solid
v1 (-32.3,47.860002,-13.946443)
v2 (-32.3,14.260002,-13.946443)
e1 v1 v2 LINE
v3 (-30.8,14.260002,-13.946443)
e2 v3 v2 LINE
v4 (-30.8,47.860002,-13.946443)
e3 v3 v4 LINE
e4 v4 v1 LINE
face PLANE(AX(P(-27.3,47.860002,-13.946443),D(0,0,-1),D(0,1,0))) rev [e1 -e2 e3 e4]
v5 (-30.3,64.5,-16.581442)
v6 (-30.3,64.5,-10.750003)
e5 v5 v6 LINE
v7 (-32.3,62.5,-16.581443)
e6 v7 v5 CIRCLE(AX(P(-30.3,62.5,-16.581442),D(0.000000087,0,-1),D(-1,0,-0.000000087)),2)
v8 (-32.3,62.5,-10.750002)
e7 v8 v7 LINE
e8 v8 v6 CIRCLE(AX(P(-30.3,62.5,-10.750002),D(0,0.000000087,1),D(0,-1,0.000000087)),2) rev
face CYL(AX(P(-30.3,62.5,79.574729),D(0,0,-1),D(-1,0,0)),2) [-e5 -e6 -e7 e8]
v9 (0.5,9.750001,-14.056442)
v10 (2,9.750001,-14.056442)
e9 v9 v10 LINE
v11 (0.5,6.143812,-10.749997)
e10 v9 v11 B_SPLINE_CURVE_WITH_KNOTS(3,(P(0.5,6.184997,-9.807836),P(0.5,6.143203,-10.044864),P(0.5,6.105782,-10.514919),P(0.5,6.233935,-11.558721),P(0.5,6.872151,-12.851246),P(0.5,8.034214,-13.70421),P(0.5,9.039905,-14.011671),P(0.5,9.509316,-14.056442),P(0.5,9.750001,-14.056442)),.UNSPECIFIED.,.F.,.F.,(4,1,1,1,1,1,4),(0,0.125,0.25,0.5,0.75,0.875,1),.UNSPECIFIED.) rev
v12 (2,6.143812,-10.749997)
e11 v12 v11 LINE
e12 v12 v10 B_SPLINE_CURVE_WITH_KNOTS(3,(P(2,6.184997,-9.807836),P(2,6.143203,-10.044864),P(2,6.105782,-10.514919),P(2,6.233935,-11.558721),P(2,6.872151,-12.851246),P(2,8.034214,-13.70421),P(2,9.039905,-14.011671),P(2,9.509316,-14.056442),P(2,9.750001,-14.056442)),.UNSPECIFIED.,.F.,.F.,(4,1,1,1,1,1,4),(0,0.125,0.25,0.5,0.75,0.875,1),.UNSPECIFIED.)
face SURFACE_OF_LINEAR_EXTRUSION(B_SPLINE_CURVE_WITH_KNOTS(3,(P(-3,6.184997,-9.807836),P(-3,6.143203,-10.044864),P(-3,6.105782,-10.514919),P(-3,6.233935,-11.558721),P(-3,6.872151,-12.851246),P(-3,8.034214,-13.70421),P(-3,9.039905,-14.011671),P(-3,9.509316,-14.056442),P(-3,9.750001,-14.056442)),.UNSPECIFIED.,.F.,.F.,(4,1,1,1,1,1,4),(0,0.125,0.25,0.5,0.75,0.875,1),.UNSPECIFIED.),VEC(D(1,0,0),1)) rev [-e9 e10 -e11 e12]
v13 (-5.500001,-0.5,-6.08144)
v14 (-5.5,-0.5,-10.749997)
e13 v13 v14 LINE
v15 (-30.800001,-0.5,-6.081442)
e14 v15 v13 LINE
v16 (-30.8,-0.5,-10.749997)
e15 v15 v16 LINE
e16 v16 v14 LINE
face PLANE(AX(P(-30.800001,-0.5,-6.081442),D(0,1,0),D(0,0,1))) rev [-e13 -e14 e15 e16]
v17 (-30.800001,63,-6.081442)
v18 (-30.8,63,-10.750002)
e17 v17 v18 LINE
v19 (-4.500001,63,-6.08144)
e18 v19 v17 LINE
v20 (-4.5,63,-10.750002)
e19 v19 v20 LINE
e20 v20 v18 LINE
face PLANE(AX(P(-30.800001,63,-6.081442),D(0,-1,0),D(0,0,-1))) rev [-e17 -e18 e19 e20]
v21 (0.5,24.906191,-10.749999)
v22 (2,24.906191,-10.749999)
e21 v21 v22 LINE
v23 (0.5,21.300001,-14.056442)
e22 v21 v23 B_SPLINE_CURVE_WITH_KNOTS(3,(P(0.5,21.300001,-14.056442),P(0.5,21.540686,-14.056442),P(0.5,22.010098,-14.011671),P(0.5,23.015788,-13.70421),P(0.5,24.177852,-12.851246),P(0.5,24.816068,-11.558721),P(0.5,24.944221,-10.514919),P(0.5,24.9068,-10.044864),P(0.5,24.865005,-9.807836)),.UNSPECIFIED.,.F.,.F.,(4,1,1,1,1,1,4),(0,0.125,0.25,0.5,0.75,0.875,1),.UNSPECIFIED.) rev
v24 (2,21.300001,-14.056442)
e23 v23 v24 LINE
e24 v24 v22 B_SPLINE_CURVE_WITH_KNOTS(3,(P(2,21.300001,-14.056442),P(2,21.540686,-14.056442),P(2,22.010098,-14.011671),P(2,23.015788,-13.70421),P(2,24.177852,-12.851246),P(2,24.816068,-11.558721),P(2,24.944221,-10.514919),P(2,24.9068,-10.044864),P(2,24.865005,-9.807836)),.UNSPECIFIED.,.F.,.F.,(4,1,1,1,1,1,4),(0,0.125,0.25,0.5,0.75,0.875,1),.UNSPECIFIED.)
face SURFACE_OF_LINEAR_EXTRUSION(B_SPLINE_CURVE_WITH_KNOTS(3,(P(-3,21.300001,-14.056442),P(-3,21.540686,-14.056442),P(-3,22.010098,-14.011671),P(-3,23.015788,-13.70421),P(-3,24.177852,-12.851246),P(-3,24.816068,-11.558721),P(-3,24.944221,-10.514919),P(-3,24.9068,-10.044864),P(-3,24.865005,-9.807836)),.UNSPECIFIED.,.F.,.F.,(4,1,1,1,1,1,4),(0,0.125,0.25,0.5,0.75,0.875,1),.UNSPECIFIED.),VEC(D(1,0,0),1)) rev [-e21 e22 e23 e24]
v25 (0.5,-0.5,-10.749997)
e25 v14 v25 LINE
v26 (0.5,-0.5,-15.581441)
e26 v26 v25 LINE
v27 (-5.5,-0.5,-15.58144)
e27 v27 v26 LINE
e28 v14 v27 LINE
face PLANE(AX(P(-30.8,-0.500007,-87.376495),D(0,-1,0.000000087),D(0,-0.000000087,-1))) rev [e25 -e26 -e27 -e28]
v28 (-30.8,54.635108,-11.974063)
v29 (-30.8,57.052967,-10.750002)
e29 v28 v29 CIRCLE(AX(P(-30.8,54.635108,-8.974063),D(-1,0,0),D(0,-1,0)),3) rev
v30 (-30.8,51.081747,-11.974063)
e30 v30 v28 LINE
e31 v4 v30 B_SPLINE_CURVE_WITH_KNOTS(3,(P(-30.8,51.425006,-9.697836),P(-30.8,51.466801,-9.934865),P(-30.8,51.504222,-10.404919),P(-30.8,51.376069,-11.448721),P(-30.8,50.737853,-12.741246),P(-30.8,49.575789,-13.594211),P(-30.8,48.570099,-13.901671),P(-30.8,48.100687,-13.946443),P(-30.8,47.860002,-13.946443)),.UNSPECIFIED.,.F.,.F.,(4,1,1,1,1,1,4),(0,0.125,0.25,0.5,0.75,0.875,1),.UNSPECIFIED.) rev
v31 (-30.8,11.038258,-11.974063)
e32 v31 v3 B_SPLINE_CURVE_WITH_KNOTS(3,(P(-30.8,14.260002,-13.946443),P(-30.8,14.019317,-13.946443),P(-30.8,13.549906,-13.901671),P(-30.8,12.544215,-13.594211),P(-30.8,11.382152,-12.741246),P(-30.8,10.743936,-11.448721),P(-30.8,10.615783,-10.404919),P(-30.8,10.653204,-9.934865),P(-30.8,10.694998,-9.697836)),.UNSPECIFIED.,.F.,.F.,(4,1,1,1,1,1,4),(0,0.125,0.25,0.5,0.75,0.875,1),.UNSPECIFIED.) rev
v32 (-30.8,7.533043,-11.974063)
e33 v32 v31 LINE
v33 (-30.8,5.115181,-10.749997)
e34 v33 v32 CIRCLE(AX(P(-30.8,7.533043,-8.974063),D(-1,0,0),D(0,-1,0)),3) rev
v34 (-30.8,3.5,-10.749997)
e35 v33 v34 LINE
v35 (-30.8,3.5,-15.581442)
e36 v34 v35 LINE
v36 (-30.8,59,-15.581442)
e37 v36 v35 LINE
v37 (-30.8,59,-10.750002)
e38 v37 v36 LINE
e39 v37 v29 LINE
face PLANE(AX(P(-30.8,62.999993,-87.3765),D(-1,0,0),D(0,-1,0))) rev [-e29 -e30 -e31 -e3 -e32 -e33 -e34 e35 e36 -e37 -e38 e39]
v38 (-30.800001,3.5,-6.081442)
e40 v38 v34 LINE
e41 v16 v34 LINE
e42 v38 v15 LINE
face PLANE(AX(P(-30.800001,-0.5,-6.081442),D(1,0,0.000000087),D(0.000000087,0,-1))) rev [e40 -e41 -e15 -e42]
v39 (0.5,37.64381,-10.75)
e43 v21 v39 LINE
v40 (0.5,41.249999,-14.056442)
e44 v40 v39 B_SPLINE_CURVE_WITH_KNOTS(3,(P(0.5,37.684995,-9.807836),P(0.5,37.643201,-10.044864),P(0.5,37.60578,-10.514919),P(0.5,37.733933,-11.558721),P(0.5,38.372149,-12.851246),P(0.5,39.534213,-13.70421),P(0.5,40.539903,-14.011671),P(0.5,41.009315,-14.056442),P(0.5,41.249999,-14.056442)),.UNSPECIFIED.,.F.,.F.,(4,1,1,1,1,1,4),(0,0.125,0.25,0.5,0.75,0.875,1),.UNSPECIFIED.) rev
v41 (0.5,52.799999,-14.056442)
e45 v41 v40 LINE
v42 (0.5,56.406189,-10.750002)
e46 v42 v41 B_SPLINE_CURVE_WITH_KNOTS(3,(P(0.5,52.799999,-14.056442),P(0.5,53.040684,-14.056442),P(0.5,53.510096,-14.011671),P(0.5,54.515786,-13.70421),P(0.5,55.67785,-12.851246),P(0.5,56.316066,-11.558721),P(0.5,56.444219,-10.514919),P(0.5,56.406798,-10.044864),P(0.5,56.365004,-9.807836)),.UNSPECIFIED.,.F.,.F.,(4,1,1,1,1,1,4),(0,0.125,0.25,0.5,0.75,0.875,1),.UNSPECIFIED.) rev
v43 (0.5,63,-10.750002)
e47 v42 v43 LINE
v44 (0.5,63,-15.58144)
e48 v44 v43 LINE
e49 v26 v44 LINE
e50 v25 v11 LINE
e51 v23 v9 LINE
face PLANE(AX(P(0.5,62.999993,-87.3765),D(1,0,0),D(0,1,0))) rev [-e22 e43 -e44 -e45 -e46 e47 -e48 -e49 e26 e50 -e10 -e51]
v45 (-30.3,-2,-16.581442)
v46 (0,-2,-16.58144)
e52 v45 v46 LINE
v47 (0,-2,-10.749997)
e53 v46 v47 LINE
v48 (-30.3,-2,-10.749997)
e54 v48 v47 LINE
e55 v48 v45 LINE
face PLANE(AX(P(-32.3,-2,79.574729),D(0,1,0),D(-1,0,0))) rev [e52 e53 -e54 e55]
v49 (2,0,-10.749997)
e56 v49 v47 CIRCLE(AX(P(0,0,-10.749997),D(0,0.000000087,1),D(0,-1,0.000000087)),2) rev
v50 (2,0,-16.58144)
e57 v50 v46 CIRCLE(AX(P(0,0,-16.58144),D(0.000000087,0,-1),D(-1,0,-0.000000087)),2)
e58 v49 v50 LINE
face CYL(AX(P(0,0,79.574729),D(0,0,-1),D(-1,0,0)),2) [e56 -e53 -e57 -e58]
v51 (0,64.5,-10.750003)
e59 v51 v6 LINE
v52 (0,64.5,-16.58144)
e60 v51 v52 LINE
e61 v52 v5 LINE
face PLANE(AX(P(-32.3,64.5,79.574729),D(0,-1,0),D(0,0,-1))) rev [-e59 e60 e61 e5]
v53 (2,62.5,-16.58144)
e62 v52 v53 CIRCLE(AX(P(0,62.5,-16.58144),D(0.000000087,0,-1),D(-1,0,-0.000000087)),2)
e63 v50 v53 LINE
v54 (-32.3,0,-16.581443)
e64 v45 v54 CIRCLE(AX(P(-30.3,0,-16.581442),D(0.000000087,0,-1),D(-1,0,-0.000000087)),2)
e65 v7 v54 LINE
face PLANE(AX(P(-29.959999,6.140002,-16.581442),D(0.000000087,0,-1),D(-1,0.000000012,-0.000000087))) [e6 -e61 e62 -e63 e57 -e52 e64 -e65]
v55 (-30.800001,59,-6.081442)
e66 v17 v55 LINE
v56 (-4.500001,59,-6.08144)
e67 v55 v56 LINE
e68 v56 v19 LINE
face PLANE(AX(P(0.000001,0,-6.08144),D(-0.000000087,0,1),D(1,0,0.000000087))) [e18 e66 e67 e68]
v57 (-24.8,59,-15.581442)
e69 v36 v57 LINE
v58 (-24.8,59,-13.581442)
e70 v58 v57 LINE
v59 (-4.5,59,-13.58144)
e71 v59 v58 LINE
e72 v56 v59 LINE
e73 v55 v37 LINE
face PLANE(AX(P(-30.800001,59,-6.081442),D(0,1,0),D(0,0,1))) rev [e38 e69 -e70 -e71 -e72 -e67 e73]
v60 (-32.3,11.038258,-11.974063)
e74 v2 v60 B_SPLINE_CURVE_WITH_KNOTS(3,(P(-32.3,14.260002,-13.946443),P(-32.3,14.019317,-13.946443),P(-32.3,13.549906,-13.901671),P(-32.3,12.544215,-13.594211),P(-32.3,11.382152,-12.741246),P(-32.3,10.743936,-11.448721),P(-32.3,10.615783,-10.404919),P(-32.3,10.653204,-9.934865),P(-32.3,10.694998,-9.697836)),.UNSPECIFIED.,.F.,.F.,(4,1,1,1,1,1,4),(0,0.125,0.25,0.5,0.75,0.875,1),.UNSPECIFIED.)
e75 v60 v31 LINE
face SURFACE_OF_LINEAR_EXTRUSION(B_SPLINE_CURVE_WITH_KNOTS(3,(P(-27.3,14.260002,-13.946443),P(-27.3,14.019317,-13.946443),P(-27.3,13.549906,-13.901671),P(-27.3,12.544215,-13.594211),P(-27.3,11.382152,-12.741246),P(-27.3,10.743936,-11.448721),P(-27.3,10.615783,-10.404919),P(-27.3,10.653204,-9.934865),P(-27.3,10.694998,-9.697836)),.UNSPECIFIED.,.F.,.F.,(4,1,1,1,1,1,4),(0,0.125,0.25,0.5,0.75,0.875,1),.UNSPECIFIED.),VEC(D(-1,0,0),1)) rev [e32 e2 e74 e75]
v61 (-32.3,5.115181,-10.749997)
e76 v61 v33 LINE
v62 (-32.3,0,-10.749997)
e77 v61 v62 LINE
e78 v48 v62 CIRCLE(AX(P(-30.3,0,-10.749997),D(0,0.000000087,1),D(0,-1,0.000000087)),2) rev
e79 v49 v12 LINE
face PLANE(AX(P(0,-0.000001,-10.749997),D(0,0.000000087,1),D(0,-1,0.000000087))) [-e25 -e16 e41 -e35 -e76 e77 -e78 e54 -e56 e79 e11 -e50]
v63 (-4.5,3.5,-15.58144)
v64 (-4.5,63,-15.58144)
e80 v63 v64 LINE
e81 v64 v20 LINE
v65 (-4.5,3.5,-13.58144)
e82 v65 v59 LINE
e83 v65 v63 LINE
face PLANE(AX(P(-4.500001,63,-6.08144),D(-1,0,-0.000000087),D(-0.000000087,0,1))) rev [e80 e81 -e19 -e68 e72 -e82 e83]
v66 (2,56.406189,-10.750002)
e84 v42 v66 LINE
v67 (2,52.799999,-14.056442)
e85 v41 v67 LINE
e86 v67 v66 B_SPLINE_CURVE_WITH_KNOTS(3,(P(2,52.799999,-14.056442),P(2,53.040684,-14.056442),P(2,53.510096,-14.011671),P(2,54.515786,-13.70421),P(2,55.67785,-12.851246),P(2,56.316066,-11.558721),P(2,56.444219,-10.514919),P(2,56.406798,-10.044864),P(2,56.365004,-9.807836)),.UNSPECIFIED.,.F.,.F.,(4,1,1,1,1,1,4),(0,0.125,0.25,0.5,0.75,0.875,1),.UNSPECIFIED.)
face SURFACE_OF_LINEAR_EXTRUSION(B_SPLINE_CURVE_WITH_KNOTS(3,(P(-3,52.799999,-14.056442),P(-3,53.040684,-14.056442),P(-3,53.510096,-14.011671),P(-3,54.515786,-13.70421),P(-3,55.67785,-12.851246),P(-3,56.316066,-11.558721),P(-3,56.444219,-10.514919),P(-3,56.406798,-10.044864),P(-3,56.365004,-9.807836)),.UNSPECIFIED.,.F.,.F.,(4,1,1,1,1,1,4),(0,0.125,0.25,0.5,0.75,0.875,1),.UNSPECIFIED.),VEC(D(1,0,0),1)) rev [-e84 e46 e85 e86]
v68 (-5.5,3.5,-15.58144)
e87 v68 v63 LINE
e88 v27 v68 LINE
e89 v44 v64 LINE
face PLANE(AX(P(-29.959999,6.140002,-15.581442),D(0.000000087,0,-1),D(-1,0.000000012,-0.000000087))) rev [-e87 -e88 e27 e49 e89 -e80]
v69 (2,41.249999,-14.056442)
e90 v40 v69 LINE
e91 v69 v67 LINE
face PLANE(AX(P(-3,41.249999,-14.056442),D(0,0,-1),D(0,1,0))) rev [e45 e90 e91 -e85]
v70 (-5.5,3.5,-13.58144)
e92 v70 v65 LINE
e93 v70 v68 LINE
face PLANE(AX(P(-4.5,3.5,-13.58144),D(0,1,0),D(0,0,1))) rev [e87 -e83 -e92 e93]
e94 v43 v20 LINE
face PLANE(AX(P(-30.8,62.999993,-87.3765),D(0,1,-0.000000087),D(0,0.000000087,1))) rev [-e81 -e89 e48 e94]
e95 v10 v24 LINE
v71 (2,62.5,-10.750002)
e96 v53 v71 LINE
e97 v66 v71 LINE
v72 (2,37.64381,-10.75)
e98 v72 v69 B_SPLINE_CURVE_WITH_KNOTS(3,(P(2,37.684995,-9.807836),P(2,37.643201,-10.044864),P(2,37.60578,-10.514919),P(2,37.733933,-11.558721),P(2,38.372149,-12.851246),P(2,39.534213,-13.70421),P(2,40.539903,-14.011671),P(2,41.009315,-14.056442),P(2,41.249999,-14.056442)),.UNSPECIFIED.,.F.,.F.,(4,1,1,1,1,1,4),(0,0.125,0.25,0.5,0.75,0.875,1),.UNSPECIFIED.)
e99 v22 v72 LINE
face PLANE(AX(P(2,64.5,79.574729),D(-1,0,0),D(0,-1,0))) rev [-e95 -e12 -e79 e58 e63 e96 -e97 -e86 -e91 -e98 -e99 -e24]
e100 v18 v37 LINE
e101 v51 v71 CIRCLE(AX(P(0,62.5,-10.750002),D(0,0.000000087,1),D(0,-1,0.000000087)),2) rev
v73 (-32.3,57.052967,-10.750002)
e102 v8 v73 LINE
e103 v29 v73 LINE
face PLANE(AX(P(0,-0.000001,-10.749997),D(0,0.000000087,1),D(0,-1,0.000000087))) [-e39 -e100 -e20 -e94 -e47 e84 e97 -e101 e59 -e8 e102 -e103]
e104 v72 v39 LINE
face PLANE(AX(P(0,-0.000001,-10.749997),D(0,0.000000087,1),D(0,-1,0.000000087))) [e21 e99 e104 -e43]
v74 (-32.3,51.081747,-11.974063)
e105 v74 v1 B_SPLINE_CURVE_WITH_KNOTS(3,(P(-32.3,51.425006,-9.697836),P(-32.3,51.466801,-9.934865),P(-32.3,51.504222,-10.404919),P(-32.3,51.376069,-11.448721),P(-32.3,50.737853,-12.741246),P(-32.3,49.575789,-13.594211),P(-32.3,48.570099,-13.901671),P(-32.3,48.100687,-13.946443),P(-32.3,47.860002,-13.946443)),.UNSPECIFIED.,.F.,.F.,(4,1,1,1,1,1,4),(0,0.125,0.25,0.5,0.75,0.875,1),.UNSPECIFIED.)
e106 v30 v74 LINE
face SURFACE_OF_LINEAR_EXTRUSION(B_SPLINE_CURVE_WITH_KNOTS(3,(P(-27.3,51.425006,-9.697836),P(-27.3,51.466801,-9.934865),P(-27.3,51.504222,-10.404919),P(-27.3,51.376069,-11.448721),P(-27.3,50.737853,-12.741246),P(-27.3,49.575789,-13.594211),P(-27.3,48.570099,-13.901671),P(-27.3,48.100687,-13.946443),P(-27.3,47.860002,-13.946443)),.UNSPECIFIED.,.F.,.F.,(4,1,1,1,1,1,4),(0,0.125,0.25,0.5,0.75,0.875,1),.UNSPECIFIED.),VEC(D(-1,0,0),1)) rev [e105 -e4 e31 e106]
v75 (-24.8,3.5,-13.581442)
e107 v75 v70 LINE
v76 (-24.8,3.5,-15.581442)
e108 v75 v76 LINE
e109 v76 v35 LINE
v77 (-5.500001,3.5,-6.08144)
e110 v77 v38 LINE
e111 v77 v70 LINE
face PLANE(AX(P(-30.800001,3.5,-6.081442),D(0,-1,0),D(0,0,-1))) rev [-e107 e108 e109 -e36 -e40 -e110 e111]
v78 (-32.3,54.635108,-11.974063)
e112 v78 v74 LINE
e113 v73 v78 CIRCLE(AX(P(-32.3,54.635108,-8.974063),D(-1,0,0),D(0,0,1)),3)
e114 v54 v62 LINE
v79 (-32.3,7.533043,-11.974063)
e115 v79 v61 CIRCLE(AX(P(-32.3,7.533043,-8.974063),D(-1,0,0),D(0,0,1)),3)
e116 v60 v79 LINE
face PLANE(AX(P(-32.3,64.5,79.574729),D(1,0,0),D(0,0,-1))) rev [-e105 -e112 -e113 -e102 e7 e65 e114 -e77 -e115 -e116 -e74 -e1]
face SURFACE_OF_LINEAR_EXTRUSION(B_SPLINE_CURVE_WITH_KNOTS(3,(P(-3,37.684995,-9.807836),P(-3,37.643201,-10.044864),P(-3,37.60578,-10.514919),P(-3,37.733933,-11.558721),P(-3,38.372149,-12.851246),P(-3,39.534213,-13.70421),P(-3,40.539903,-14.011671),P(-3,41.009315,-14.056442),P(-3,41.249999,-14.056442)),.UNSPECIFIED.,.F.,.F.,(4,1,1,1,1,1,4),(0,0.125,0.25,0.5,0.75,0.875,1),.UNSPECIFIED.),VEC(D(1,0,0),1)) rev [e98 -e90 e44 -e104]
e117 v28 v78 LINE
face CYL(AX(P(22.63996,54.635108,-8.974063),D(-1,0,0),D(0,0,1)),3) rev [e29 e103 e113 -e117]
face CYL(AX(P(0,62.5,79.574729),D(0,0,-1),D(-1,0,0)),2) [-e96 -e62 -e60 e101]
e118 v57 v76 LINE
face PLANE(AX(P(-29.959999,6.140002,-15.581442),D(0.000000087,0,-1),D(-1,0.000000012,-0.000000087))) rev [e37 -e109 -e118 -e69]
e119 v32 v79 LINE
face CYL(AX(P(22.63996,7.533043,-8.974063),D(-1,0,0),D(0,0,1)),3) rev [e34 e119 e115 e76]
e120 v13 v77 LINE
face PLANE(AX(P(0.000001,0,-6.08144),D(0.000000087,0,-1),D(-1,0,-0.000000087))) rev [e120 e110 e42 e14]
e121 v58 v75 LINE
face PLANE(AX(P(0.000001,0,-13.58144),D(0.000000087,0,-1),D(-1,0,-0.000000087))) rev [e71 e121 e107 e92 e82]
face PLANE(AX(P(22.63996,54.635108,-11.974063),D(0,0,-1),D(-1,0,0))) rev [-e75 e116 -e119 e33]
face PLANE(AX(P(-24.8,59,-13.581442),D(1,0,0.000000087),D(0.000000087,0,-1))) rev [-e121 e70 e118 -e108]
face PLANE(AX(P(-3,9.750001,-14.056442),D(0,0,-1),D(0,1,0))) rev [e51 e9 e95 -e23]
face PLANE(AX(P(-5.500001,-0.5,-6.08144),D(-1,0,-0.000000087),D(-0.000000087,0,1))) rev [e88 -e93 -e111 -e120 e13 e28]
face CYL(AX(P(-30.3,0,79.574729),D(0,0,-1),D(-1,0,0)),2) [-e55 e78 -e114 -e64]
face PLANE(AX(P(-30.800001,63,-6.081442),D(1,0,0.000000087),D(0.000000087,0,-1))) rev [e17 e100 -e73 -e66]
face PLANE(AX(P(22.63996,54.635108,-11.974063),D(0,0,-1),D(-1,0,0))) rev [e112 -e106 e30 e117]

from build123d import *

# Parameters (mm, degrees)
BOSS_EXTRUDE3_DEPTH      = 3.249999
BOSS_EXTRUDE3_DEPTH_BACK = 16.581442
SKETCH1_W                = 34.3
SKETCH1_H                = 66.5
CUT_EXTRUDE1_DEPTH       = 5
CUT_EXTRUDE2_DEPTH       = 5
FILLET1_R                = 2
SKETCH5_W                = 51.30778099
SKETCH5_H                = 76.39990746
CUT_EXTRUDE3_DEPTH       = 14
SKETCH6_W                = 31.3
SKETCH6_H                = 63.5
CUT_EXTRUDE4_DEPTH       = 4.831437303
SKETCH7_W                = 26.3
SKETCH7_H                = 4
SKETCH7_W_2              = 25.3
BOSS_EXTRUDE4_DEPTH      = 9.5
SKETCH8_W                = 20.3
SKETCH8_H                = 55.5
BOSS_EXTRUDE5_DEPTH      = 2
CUT_EXTRUDE5_DEPTH       = 1.5


with BuildPart() as part:
    # Sketch1 → Boss-Extrude3 (new, two sides: drawn at the far end of the back side and taken through both)
    with BuildSketch(Plane.XY.offset(-BOSS_EXTRUDE3_DEPTH_BACK)):
        with Locations((-15.15, 31.25)):
            Rectangle(SKETCH1_W, SKETCH1_H)
    extrude(amount=BOSS_EXTRUDE3_DEPTH + BOSS_EXTRUDE3_DEPTH_BACK)

    # Sketch3 → Cut-Extrude1 (cut)
    with BuildSketch(Plane.ZY.offset(32.3)):
        with BuildLine():
            Line((-13.946442816, 47.860002379), (-13.946442816, 14.260002379))
            add(Edge.make_bspline(
                [(-13.946442816, 14.260002379), (-13.946442816, 14.019317473), (-13.90167089, 13.549905983), (-13.594210712, 12.544215416), (-12.741245974, 11.38215204), (-11.448721179, 10.74393594), (-10.404919412, 10.615783107), (-9.934864774, 10.653203818), (-9.697836412, 10.694998313)],
                knots=[0, 0, 0, 0, 0.125, 0.25, 0.5, 0.75, 0.875, 1, 1, 1, 1], degree=3))
            Line((-9.697836412, 10.694998313), (-6.707836413, 11.222215985))
            add(Edge.make_bspline(
                [(-6.707836413, 11.222215985), (-6.30796959, 11.292723295), (-5.54451734, 11.557407058), (-4.497780226, 12.405299319), (-3.844533346, 13.58336909), (-3.716442816, 14.381184638), (-3.716442816, 14.787220052)],
                knots=[0, 0, 0, 0, 0.25, 0.5, 0.75, 1, 1, 1, 1], degree=3))
            Line((-3.716442816, 14.787220052), (-3.716442816, 47.332784706))
            add(Edge.make_bspline(
                [(-3.716442816, 47.332784706), (-3.716442815, 47.73882012), (-3.844533346, 48.536635667), (-4.497780225, 49.714705439), (-5.544517339, 50.5625977), (-6.307969589, 50.827281463), (-6.707836412, 50.897788773)],
                knots=[0, 0, 0, 0, 0.25, 0.5, 0.75, 1, 1, 1, 1], degree=3))
            Line((-6.707836412, 50.897788773), (-9.697836412, 51.425006445))
            add(Edge.make_bspline(
                [(-9.697836412, 51.425006445), (-9.934864773, 51.46680094), (-10.404919411, 51.504221651), (-11.448721179, 51.376068818), (-12.741245974, 50.737852719), (-13.594210712, 49.575789343), (-13.90167089, 48.570098776), (-13.946442816, 48.100687285), (-13.946442816, 47.860002379)],
                knots=[0, 0, 0, 0, 0.125, 0.25, 0.5, 0.75, 0.875, 1, 1, 1, 1], degree=3))
        make_face()
    extrude(amount=-CUT_EXTRUDE1_DEPTH, mode=Mode.SUBTRACT)

    # Sketch4 → Cut-Extrude2 (cut)
    with BuildSketch(Plane(origin=(2, 0, 0), x_dir=(0, 0, -1), z_dir=(1, 0, 0))):
        with BuildLine():
            Line((6.817836087, 38.212213104), (9.807836086, 37.684995431))
            add(Edge.make_bspline(
                [(9.807836086, 37.684995431), (10.044864448, 37.643200936), (10.514919086, 37.605780225), (11.558720853, 37.733933058), (12.851245648, 38.372149158), (13.704210386, 39.534212534), (14.011670565, 40.539903101), (14.05644249, 41.009314591), (14.05644249, 41.249999497)],
                knots=[0, 0, 0, 0, 0.125, 0.25, 0.5, 0.75, 0.875, 1, 1, 1, 1], degree=3))
            Line((14.05644249, 41.249999497), (14.05644249, 52.799999497))
            add(Edge.make_bspline(
                [(14.05644249, 52.799999497), (14.05644249, 53.040684403), (14.011670565, 53.510095894), (13.704210386, 54.51578646), (12.851245648, 55.677849837), (11.558720853, 56.316065936), (10.514919086, 56.444218769), (10.044864448, 56.406798058), (9.807836087, 56.365003563)],
                knots=[0, 0, 0, 0, 0.125, 0.25, 0.5, 0.75, 0.875, 1, 1, 1, 1], degree=3))
            Line((9.807836087, 56.365003563), (6.817836087, 55.837785891))
            add(Edge.make_bspline(
                [(6.817836087, 55.837785891), (6.417969263, 55.767278581), (5.654517014, 55.502594818), (4.6077799, 54.654702557), (3.95453302, 53.476632786), (3.82644249, 52.678817239), (3.82644249, 52.272781825)],
                knots=[0, 0, 0, 0, 0.25, 0.5, 0.75, 1, 1, 1, 1], degree=3))
            Line((3.82644249, 52.272781825), (3.82644249, 41.77721717))
            add(Edge.make_bspline(
                [(3.82644249, 41.77721717), (3.82644249, 41.371181756), (3.95453302, 40.573366208), (4.6077799, 39.395296437), (5.654517014, 38.547404177), (6.417969263, 38.282720413), (6.817836087, 38.212213104)],
                knots=[0, 0, 0, 0, 0.25, 0.5, 0.75, 1, 1, 1, 1], degree=3))
        make_face()
        with BuildLine():
            Line((3.82644249, 20.772783732), (3.82644249, 10.277219077))
            add(Edge.make_bspline(
                [(3.82644249, 10.277219077), (3.82644249, 9.871183663), (3.95453302, 9.073368116), (4.6077799, 7.895298345), (5.654517014, 7.047406084), (6.417969263, 6.782722321), (6.817836087, 6.712215011)],
                knots=[0, 0, 0, 0, 0.25, 0.5, 0.75, 1, 1, 1, 1], degree=3))
            Line((6.817836087, 6.712215011), (9.807836086, 6.184997339))
            add(Edge.make_bspline(
                [(9.807836086, 6.184997339), (10.044864448, 6.143202843), (10.514919086, 6.105782132), (11.558720853, 6.233934965), (12.851245648, 6.872151065), (13.704210386, 8.034214441), (14.011670565, 9.039905008), (14.05644249, 9.509316499), (14.05644249, 9.750001404)],
                knots=[0, 0, 0, 0, 0.125, 0.25, 0.5, 0.75, 0.875, 1, 1, 1, 1], degree=3))
            Line((14.05644249, 9.750001404), (14.05644249, 21.300001404))
            add(Edge.make_bspline(
                [(14.05644249, 21.300001404), (14.05644249, 21.54068631), (14.011670565, 22.010097801), (13.704210386, 23.015788368), (12.851245648, 24.177851744), (11.558720853, 24.816067843), (10.514919086, 24.944220677), (10.044864448, 24.906799966), (9.807836087, 24.86500547)],
                knots=[0, 0, 0, 0, 0.125, 0.25, 0.5, 0.75, 0.875, 1, 1, 1, 1], degree=3))
            Line((9.807836087, 24.86500547), (6.817836087, 24.337787798))
            add(Edge.make_bspline(
                [(6.817836087, 24.337787798), (6.417969263, 24.267280488), (5.654517014, 24.002596725), (4.6077799, 23.154704464), (3.95453302, 21.976634693), (3.82644249, 21.178819146), (3.82644249, 20.772783732)],
                knots=[0, 0, 0, 0, 0.25, 0.5, 0.75, 1, 1, 1, 1], degree=3))
        make_face()
    extrude(amount=-CUT_EXTRUDE2_DEPTH, mode=Mode.SUBTRACT)

    # Fillet1
    fillet1_edges = [part.edges().sort_by_distance(p)[0] for p in [
        (-32.3, -2, -6.6657215),
        (2, -2, -6.6657215),
        (2, 64.5, -6.6657215),
        (-32.3, 64.5, -6.6657215),
    ]]
    fillet(fillet1_edges, radius=FILLET1_R)

    # Sketch5 → Cut-Extrude3 (cut)
    with BuildSketch(Plane(origin=(0, 2.84e-07, 3.250003097), x_dir=(1, 0, 0), z_dir=(0, 8.742273400000003e-08, 0.9999999999999963))):
        with Locations((-12.815688561, 29.564706803)):
            Rectangle(SKETCH5_W, SKETCH5_H)
    extrude(amount=-CUT_EXTRUDE3_DEPTH, mode=Mode.SUBTRACT)


with BuildPart() as cut_extrude3_kept_piece:
    # of the separate pieces the step leaves, the one the design keeps (cut_extrude3_pieces_kept)
    add(part.part.solids().sort_by_distance((-30.3, 64.5, -16.581442))[0])

    # Sketch6 → Cut-Extrude4 (cut)
    with BuildSketch(Plane(origin=(0, -9.4e-07, -10.749996903), x_dir=(1, 0, 0), z_dir=(0, 8.742273399652584e-08, 0.9999999999999963))):
        with Locations((-15.15, 31.25000094)):
            Rectangle(SKETCH6_W, SKETCH6_H)
    extrude(amount=-CUT_EXTRUDE4_DEPTH, mode=Mode.SUBTRACT)


with BuildPart() as boss_extrude4_tool:
    # Sketch7 → Boss-Extrude4 (new body)
    with BuildSketch(Plane(origin=(1.362e-06, 0, -15.581439757), x_dir=(0.9999999999999963, 0, 8.742273400000003e-08), z_dir=(-8.742273400000003e-08, 1.0000000000000005e-15, 0.9999999999999963))):
        with Locations((-17.650001362, 60.999999578)):
            Rectangle(SKETCH7_W, SKETCH7_H)
        with Locations((-18.150001362, 1.499999578)):
            Rectangle(SKETCH7_W_2, SKETCH7_H)
    extrude(amount=BOSS_EXTRUDE4_DEPTH)


with BuildPart() as cut_extrude3_kept_piece_1:
    add(cut_extrude3_kept_piece.part)


with BuildPart() as cut_extrude3_kept_piece_2:
    # Boss-Extrude4: joined with boss_extrude4_tool
    add(cut_extrude3_kept_piece_1.part.fuse(boss_extrude4_tool.part, tol=0.00001))

    # Sketch8 → Boss-Extrude5 (add)
    with BuildSketch(Plane(origin=(1.362e-06, 0, -15.581439757), x_dir=(0.9999999999999963, 0, 8.742273400000003e-08), z_dir=(-8.742273400000003e-08, 1.0000000000000005e-15, 0.9999999999999963))):
        with Locations((-14.650001362, 31.249999578)):
            Rectangle(SKETCH8_W, SKETCH8_H)
    extrude(amount=BOSS_EXTRUDE5_DEPTH)

    # Sketch9 → Cut-Extrude5 (cut)
    with BuildSketch(Plane.ZY.offset(32.3)):
        with BuildLine():
            Line((-11.974063023, 54.635108256), (-11.974063023, 7.533043045))
            ThreePointArc((-11.974063023, 7.533043045), (-8.974063023, 4.533043045), (-5.974063023, 7.533043045))
            Line((-5.974063023, 7.533043045), (-5.974063023, 54.635108256))
            ThreePointArc((-5.974063023, 54.635108256), (-8.974063023, 57.635108256), (-11.974063023, 54.635108256))
        make_face()
    extrude(amount=-CUT_EXTRUDE5_DEPTH, mode=Mode.SUBTRACT)


solid = cut_extrude3_kept_piece_2.part
